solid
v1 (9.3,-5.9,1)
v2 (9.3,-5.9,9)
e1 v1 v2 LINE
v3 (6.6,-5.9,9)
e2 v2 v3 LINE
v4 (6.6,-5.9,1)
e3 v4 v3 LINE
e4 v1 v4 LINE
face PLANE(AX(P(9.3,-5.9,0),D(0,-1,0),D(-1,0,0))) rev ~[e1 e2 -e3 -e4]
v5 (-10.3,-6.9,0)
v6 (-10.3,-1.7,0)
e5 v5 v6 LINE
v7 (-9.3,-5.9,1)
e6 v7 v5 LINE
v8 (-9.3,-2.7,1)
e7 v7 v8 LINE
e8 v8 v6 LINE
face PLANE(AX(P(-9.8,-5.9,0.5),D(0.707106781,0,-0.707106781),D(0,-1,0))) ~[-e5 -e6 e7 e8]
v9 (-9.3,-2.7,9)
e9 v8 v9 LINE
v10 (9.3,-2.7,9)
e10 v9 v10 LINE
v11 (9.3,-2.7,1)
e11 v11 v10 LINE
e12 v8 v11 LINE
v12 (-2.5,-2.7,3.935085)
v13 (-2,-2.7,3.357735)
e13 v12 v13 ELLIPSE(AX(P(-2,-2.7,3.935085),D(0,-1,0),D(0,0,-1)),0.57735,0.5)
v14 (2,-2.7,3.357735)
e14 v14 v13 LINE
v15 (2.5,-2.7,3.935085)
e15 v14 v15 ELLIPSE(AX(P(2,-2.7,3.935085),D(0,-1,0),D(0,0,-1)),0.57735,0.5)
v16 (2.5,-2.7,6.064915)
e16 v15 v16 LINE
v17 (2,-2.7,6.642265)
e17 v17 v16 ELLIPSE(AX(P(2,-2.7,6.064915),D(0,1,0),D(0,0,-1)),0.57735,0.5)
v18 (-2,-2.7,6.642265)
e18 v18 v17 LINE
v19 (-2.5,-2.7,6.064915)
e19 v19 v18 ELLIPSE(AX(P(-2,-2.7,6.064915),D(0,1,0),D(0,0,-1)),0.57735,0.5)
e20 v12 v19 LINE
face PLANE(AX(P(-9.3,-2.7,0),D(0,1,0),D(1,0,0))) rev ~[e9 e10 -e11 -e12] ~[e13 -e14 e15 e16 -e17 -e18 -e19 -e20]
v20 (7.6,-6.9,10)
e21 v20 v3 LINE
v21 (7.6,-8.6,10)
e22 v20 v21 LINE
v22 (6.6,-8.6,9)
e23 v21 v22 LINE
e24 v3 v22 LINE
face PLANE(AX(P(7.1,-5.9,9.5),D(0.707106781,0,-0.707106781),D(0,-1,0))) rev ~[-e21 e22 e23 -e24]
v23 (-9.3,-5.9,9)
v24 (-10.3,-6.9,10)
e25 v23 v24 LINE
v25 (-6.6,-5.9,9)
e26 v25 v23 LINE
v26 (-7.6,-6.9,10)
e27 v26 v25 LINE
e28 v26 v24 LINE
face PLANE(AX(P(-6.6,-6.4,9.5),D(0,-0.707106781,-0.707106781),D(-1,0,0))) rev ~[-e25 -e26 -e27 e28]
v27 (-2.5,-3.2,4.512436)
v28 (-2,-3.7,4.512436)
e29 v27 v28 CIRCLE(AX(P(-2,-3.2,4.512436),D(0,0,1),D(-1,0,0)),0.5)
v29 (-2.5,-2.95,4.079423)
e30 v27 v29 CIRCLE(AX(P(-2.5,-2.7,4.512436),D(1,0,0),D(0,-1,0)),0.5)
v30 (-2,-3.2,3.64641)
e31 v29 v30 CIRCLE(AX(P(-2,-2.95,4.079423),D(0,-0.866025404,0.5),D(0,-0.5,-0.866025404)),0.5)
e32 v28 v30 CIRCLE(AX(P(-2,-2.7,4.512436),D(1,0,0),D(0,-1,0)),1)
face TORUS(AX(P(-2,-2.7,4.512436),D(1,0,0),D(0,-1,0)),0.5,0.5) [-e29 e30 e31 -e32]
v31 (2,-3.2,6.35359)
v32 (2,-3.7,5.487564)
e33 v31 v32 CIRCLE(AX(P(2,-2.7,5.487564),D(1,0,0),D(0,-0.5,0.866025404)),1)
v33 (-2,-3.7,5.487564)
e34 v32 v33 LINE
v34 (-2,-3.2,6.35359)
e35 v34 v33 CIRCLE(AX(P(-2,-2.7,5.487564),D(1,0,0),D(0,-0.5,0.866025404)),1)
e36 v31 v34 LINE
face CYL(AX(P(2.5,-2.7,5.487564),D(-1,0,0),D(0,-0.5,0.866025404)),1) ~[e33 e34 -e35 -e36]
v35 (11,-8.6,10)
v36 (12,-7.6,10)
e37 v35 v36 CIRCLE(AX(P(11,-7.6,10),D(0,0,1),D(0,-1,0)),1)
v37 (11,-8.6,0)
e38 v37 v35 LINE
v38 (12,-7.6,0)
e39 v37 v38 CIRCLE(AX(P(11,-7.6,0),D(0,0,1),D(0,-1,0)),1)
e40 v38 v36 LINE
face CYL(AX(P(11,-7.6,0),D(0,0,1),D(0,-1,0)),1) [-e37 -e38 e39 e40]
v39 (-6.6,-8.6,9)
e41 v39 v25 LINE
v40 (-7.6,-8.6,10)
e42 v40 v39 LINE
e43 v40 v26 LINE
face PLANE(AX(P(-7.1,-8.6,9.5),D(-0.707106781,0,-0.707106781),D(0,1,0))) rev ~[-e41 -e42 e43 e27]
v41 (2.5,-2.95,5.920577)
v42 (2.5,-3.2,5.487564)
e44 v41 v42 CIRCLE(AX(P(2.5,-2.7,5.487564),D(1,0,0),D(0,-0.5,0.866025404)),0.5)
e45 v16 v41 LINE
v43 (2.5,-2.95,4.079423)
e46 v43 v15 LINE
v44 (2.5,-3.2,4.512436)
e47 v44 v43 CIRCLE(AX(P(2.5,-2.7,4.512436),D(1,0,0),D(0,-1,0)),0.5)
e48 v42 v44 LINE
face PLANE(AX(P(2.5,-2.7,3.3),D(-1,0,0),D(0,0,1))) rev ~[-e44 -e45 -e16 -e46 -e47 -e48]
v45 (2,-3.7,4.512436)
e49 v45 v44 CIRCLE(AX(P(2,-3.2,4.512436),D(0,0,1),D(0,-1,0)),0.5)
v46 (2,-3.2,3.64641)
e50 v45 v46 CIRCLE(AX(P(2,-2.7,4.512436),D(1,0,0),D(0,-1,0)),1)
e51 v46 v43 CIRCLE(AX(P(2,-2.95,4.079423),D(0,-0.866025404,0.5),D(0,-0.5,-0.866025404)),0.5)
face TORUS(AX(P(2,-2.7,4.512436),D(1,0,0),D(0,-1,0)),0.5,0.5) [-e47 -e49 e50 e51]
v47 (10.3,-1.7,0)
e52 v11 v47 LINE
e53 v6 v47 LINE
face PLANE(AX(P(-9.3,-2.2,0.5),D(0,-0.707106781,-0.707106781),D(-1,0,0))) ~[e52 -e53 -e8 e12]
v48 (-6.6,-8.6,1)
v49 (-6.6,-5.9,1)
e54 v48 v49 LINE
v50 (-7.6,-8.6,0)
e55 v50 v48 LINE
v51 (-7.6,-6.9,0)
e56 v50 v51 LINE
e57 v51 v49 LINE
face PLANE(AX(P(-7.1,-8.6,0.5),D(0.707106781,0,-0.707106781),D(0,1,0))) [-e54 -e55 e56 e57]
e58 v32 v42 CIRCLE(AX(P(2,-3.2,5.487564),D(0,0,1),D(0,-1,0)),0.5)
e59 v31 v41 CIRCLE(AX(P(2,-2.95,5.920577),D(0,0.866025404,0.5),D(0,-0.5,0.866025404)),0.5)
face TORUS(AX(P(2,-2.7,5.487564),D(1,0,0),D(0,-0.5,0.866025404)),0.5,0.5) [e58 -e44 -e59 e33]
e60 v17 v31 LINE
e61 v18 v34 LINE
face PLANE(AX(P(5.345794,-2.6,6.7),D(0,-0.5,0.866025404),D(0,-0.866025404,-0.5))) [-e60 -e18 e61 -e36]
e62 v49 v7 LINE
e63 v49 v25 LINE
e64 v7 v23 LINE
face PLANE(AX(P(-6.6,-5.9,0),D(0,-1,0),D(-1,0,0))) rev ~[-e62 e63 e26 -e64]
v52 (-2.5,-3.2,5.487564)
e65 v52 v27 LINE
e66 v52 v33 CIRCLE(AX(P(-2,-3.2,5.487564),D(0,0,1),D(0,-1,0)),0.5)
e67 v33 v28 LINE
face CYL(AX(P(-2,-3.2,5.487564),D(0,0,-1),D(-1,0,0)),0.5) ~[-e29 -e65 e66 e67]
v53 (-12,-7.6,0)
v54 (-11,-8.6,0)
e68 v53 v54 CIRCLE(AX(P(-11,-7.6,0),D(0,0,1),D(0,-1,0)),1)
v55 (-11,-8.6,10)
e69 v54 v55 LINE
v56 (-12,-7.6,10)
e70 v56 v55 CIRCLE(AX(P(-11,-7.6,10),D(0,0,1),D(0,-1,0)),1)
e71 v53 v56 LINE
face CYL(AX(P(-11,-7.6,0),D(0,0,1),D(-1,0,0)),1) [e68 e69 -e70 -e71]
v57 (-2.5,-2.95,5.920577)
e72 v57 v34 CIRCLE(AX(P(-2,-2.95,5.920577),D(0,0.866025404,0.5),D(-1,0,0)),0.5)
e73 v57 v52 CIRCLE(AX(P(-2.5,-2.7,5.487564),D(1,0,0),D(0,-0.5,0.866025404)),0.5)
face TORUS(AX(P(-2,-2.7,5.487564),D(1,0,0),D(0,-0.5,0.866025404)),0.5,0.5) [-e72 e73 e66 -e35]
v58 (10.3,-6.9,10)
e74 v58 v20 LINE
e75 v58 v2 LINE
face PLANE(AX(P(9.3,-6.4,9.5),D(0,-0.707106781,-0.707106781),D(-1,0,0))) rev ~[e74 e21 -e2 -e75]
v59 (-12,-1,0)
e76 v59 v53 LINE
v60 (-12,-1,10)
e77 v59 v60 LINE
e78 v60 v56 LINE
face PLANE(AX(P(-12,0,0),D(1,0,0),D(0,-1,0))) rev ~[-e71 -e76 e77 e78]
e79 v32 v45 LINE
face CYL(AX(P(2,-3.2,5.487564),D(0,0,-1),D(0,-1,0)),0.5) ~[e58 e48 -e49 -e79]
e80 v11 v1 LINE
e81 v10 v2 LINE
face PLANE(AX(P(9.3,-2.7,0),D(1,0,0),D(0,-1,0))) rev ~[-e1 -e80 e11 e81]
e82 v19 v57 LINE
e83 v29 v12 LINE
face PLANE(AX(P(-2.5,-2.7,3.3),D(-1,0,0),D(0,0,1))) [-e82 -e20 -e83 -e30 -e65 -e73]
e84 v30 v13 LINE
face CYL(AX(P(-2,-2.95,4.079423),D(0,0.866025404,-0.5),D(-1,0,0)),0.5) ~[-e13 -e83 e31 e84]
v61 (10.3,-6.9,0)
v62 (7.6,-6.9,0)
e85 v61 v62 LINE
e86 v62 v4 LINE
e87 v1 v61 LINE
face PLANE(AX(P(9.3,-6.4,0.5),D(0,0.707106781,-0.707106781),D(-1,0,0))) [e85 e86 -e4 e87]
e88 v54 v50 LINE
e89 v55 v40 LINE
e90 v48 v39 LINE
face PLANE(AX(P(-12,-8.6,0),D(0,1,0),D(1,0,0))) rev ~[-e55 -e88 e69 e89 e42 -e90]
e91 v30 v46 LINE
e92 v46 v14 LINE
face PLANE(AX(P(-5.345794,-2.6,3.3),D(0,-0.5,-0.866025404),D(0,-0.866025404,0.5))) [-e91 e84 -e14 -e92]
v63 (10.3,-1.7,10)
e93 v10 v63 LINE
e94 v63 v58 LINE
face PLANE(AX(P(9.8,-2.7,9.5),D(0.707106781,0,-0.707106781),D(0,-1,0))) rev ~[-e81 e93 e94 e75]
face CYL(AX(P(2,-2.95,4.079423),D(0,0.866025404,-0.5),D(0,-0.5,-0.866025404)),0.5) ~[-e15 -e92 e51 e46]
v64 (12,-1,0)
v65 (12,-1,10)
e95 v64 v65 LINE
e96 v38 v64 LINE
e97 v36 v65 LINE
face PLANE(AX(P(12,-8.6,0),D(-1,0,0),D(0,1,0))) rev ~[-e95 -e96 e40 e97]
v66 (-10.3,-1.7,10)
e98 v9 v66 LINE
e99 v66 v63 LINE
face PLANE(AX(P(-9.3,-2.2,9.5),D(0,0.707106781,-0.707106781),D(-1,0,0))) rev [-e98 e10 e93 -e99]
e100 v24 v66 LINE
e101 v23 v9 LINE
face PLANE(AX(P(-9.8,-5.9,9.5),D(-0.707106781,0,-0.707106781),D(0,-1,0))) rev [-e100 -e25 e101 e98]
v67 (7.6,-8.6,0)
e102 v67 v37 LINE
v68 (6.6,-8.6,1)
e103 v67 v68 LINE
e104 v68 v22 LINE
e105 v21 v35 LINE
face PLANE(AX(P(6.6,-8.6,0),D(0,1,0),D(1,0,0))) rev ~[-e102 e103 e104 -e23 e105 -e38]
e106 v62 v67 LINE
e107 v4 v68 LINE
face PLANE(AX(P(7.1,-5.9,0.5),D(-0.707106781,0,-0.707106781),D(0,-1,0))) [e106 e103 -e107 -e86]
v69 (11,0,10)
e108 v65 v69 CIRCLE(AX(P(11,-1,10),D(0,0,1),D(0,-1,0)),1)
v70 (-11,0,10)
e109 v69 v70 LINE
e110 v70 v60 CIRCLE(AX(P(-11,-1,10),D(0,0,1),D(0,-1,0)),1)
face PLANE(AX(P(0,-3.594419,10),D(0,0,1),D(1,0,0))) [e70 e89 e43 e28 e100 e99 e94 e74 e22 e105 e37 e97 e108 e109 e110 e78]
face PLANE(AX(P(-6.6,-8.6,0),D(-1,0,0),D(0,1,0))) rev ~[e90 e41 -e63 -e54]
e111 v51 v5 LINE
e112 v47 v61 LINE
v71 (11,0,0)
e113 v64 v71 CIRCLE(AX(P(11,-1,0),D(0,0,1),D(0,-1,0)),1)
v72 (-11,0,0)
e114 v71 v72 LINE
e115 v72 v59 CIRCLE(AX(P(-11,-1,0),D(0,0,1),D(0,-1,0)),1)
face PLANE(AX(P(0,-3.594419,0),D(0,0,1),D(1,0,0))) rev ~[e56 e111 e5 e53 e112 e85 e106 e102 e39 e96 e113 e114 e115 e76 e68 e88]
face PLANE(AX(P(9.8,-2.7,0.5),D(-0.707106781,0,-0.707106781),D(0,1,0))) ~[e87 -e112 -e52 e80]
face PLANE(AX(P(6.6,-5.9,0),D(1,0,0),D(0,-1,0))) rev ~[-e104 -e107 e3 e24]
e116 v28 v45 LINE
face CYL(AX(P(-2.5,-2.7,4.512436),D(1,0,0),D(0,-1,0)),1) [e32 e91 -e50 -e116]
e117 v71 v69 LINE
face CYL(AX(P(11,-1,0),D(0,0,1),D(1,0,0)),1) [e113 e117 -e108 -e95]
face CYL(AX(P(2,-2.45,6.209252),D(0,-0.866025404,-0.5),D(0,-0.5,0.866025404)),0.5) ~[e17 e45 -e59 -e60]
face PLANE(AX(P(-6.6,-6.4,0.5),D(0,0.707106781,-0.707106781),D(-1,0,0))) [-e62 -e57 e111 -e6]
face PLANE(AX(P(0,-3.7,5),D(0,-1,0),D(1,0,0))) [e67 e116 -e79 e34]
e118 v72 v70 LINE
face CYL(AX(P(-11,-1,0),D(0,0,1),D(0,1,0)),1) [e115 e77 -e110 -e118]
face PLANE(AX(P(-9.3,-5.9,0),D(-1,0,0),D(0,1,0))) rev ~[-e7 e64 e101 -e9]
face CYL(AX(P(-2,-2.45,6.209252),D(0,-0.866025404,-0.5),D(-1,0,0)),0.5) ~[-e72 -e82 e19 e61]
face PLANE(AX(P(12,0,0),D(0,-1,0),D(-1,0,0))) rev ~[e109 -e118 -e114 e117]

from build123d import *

# Parameters (mm, degrees)
F1_DEPTH    = 10
F2_W        = 5
F2_H        = 3.4
F3_DEPTH    = 1
F4_T4_DEPTH = 10.6915886602
F4_T9_DEPTH = 10.6915886602
F5_R        = 1
F6_R        = 0.5
F7_SIZE     = 1
F8_R        = 1


# Not quite as in the source:
# - a fillet or chamfer that OpenCascade refuses, or shapes differently, is made with other operations: its cross-section is extruded or revolved along the edge and cut away or added


with BuildPart() as f1:
    # F0 (on Top) → F1 (new body)
    with BuildSketch(Plane.XY):
        Polygon((-6.6, -5.9), (-9.3, -5.9), (-9.3, -2.7), (0, -2.7), (9.3, -2.7), (9.3, -5.9), (6.6, -5.9), (6.6, -8.6), (12, -8.6), (12, 0), (0, 0), (-12, 0), (-12, -8.6), (-6.6, -8.6), align=None)
    extrude(amount=F1_DEPTH)

    # F2 (on face) → F3 (join)
    with BuildSketch(Plane.XZ.offset(2.7)):
        with Locations((0, 5)):
            Rectangle(F2_W, F2_H)
    extrude(amount=F3_DEPTH)

    # F4: chamfer of 1.1 x 0.6350852961 on 2 edges, made by hand


with BuildPart() as f4_tool2:
    # F4_s3 → F4_t4 (new body)
    with BuildSketch(Plane.YZ.offset(5.3457943301)):
        Polygon((-2.6, 6.7), (-3.7, 6.0649147039), (-3.7, 6.7), align=None)
    extrude(amount=-F4_T4_DEPTH)

    split(bisect_by=Plane.XZ.offset(2.7), keep=Keep.TOP)


with BuildPart() as f1_1:
    add(f1.part)

    # F4_t1: cut F4_tool2
    add(f4_tool2.part, mode=Mode.SUBTRACT)


with BuildPart() as f4_tool7:
    # F4_s8 → F4_t9 (new body)
    with BuildSketch(Plane.YZ.offset(-5.3457943301)):
        Polygon((-2.6, 3.3), (-3.7, 3.9350852961), (-3.7, 3.3), align=None)
    extrude(amount=F4_T9_DEPTH)

    split(bisect_by=Plane.XZ.offset(2.7), keep=Keep.TOP)


with BuildPart() as f1_2:
    add(f1_1.part)

    # F4_t6: cut F4_tool7
    add(f4_tool7.part, mode=Mode.SUBTRACT)

    # F5
    f5_edges = [f1_2.edges().sort_by_distance(p)[0] for p in [
        (0, -3.7, 3.935085),
        (0, -3.7, 6.064915),
    ]]
    fillet(f5_edges, radius=F5_R)

    # F6
    f6_edges = [f1_2.edges().sort_by_distance(p)[0] for p in [
        (2.5, -3.566025, 4.012436),
        (2.5, -3.566025, 5.987564),
        (-2.5, -3.566025, 4.012436),
        (-2.5, -3.566025, 5.987564),
        (2.5, -2.95, 6.497927),
        (-2.5, -2.95, 6.497927),
        (2.5, -3.7, 5),
        (2.5, -2.95, 3.502073),
        (-2.5, -2.95, 3.502073),
        (-2.5, -3.7, 5),
    ]]
    fillet(f6_edges, radius=F6_R)

    # F7
    f7_edges = [f1_2.edges().sort_by_distance(p)[0] for p in [
        (-9.3, -4.3, 0),
        (0, -2.7, 0),
        (-7.95, -5.9, 0),
        (-6.6, -7.25, 0),
        (9.3, -4.3, 0),
        (7.95, -5.9, 0),
        (6.6, -7.25, 0),
        (-9.3, -4.3, 10),
        (-7.95, -5.9, 10),
        (-6.6, -7.25, 10),
        (0, -2.7, 10),
        (9.3, -4.3, 10),
        (7.95, -5.9, 10),
        (6.6, -7.25, 10),
    ]]
    chamfer(f7_edges, length=F7_SIZE)

    # F8
    f8_edges = [f1_2.edges().sort_by_distance(p)[0] for p in [
        (-12, -8.6, 5),
        (12, -8.6, 5),
        (-12, 0, 5),
        (12, 0, 5),
    ]]
    fillet(f8_edges, radius=F8_R)


solid = f1_2.part
